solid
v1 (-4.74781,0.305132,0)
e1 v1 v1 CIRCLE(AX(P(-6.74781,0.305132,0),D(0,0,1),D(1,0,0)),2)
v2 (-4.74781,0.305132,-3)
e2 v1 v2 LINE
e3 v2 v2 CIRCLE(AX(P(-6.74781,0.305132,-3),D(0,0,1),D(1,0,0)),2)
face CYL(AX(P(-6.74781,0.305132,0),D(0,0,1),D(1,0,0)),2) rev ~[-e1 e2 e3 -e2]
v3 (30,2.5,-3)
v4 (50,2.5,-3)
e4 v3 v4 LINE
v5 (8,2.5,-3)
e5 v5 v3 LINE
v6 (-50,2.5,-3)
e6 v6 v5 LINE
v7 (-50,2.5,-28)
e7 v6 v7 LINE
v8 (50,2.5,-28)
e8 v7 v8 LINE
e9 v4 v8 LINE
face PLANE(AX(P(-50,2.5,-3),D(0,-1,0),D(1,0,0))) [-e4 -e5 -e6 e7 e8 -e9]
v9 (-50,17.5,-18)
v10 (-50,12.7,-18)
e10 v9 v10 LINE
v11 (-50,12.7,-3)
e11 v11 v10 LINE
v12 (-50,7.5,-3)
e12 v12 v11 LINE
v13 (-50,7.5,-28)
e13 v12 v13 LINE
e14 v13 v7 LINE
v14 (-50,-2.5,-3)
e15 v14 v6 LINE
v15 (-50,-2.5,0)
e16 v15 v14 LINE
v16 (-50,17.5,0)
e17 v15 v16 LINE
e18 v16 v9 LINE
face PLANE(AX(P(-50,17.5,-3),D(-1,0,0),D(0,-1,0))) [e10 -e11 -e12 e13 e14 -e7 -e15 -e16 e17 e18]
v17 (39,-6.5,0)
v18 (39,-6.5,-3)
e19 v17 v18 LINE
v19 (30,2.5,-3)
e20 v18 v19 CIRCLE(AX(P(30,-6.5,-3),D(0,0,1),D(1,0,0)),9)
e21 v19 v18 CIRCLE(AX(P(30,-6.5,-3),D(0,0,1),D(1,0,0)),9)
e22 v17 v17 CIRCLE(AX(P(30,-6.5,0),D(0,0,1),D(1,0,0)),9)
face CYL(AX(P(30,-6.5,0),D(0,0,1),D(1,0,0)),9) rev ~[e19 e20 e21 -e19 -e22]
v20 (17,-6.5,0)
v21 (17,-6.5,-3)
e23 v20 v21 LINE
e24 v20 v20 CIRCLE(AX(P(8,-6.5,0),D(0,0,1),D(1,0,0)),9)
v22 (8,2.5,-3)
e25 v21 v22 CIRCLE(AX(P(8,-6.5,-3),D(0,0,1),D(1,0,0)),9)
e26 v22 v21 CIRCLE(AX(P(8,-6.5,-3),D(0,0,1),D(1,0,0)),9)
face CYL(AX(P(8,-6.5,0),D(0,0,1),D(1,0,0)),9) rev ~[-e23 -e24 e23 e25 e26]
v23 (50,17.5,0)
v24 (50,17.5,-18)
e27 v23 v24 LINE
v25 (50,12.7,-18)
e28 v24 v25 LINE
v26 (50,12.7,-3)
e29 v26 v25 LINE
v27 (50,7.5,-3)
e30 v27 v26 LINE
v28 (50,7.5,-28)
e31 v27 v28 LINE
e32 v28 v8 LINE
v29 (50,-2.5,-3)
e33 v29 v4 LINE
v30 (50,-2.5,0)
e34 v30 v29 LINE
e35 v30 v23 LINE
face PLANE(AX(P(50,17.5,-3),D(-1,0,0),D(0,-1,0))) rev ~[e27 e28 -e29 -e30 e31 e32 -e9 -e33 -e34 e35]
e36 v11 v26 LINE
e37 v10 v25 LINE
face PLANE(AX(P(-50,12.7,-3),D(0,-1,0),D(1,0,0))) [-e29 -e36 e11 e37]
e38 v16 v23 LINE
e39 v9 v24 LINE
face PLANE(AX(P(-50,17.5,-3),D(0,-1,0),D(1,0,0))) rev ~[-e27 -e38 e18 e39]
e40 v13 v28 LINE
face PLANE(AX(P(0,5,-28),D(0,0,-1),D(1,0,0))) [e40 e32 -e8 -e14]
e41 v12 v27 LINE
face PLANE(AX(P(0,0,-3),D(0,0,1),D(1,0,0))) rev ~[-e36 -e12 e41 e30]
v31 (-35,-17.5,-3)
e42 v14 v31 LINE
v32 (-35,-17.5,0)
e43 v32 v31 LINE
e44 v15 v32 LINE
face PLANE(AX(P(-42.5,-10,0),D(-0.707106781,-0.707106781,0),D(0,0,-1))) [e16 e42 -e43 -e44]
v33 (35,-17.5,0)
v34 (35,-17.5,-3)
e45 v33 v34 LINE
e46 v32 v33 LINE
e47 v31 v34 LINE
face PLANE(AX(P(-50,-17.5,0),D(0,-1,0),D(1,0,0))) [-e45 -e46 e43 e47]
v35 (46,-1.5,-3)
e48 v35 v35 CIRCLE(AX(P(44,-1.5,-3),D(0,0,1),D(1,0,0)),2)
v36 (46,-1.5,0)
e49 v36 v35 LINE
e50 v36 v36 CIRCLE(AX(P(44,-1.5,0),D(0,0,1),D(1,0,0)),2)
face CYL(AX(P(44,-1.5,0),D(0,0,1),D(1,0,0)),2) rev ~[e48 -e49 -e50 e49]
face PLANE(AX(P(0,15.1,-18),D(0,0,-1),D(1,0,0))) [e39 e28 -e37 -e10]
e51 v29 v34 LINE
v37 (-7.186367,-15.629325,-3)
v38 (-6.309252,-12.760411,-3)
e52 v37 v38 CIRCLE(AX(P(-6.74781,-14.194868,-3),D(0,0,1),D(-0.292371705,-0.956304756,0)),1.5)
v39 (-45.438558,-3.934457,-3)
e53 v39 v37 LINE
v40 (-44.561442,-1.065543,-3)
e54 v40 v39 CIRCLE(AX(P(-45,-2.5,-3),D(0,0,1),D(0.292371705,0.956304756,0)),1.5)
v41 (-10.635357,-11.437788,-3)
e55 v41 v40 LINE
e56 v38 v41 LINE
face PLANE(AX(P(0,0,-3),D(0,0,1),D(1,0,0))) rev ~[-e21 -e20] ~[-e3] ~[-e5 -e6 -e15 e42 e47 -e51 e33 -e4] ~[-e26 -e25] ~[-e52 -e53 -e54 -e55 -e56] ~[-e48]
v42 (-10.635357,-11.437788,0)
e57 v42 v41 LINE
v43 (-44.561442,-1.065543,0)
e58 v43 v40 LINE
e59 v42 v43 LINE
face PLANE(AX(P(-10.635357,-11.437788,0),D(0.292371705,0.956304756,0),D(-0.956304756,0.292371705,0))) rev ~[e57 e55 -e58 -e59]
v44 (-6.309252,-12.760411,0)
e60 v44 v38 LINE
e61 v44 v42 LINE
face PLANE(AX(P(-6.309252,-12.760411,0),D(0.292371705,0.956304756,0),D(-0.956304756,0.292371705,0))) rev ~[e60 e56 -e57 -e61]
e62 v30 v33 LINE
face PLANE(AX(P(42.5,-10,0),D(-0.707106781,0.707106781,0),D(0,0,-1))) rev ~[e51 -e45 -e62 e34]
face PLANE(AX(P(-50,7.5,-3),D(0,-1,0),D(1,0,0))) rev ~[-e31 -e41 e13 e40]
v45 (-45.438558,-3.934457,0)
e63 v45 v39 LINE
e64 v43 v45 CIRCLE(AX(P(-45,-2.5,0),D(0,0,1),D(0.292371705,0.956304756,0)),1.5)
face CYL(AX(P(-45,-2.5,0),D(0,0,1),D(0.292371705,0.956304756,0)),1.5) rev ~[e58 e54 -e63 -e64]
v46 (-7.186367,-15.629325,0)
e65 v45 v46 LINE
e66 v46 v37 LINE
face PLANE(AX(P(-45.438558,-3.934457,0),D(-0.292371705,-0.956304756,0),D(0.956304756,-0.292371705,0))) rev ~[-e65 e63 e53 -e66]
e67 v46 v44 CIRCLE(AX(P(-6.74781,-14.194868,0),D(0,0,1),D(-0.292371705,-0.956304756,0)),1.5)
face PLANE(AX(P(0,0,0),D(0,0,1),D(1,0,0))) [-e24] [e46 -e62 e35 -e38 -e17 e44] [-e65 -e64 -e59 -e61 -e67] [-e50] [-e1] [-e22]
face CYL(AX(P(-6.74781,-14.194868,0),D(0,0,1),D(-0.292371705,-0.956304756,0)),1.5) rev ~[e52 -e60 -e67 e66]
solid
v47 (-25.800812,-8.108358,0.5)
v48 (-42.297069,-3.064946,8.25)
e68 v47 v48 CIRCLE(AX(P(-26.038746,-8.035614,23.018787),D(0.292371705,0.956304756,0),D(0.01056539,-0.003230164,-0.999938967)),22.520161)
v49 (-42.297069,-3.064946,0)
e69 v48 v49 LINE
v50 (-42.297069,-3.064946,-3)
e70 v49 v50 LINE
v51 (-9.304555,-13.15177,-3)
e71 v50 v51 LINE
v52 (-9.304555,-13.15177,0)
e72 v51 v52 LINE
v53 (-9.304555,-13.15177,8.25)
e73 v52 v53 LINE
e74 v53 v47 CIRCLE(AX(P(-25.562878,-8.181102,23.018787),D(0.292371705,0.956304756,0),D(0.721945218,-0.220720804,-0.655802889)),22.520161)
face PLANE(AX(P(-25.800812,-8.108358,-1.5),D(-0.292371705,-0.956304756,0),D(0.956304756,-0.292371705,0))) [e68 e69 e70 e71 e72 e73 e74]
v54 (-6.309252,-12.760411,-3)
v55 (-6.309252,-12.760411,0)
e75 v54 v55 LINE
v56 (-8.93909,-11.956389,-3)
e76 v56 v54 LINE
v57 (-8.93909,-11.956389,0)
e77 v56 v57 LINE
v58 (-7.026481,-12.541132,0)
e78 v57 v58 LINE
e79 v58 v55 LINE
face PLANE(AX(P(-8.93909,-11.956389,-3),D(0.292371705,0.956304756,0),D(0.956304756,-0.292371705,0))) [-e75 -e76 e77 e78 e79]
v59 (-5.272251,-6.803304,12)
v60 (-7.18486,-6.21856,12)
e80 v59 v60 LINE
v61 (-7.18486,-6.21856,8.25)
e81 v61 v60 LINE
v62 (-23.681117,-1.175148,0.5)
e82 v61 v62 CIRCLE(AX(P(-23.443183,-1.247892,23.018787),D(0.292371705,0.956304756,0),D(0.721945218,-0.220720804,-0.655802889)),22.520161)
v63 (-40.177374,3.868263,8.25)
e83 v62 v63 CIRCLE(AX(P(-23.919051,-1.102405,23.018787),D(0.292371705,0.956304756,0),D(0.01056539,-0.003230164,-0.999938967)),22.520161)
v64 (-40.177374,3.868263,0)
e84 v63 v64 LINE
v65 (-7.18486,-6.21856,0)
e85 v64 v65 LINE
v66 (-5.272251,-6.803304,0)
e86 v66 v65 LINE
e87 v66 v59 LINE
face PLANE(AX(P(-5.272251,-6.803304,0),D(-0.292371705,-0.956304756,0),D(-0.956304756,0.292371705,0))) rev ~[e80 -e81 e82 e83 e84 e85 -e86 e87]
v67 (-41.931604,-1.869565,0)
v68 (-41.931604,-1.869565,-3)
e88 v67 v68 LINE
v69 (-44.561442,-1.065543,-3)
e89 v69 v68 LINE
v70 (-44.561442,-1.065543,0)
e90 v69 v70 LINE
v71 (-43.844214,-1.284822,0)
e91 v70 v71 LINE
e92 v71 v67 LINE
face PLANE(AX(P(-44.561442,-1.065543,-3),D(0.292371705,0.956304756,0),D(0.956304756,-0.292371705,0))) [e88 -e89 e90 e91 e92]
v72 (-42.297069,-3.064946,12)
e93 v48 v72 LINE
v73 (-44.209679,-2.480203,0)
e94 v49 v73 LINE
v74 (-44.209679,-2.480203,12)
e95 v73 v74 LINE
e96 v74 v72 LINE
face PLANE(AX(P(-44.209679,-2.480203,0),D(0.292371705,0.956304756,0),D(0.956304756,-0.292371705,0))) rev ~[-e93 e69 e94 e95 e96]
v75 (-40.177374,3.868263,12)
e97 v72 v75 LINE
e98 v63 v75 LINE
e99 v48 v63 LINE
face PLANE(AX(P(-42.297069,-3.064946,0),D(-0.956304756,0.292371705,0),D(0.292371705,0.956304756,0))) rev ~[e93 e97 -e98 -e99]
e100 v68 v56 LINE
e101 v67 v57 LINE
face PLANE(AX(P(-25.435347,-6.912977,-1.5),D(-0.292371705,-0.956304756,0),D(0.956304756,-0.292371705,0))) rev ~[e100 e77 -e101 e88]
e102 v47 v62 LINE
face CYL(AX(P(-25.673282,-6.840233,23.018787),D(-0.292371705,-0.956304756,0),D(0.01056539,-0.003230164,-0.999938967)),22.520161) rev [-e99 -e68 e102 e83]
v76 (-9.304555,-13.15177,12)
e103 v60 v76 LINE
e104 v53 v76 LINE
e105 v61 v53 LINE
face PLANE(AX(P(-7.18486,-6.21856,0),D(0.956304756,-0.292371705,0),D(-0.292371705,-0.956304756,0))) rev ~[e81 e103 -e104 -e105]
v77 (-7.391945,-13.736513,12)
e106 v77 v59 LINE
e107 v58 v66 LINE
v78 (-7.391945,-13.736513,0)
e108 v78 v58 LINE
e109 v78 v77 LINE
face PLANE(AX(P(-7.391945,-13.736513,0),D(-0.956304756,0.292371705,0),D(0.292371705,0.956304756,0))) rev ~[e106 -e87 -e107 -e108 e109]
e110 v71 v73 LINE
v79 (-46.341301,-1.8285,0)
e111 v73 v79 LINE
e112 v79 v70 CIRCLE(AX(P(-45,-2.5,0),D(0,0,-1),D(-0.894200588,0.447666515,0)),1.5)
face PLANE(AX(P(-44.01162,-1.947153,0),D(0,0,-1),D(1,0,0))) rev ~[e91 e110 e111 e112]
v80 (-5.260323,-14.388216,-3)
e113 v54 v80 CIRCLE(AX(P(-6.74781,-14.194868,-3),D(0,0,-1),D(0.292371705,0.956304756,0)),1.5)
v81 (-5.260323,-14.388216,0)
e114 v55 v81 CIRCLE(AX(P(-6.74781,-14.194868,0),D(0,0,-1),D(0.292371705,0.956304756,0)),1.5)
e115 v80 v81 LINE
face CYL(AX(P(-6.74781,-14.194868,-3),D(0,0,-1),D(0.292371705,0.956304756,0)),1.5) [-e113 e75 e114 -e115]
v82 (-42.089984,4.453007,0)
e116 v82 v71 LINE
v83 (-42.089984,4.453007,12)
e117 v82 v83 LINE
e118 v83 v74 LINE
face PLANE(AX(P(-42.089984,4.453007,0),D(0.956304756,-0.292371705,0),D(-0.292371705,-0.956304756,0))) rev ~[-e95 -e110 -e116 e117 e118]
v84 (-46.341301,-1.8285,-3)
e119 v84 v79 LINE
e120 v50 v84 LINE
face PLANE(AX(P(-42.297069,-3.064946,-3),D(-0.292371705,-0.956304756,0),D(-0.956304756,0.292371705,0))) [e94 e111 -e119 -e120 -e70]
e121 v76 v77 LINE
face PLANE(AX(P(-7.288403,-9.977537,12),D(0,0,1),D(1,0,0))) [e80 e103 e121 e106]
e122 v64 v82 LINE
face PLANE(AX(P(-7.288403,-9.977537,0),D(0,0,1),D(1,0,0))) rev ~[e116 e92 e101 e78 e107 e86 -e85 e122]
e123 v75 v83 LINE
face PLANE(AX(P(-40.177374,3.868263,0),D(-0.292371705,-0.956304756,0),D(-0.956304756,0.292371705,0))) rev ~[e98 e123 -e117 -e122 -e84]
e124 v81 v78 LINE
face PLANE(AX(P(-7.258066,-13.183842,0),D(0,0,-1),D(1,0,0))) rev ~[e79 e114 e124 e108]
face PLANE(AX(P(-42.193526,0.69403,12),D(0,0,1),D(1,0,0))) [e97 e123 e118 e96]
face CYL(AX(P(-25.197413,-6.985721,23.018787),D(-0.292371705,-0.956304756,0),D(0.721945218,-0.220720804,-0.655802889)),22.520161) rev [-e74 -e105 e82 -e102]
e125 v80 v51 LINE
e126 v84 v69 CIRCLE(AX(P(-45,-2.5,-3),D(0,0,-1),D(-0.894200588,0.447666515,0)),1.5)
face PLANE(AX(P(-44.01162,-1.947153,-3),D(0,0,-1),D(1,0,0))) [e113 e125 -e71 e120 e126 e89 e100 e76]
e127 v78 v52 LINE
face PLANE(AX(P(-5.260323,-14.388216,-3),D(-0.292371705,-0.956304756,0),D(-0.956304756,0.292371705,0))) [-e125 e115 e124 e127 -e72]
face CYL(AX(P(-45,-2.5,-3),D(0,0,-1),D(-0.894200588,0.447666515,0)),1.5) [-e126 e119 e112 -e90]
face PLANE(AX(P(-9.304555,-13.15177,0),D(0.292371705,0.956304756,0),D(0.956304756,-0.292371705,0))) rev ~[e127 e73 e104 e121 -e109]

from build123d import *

# Parameters (mm, degrees)
F0_W      = 100
F0_H      = 35
F1_DEPTH  = 3
F2_W      = 100
F2_H      = 5
F3_DEPTH  = 25
F2_H_2    = 4.8
F4_DEPTH  = 15
F5_SIZE   = 15
F6_R      = 9
F6_R_2    = 2
F7_DEPTH  = 30
F9_DEPTH  = 1.25
F10_DEPTH = 6
F12_DEPTH = 3
F14_DEPTH = 12


with BuildPart() as f1:
    # F0 (on Top) → F1 (new body)
    with BuildSketch(Plane.XY):
        Rectangle(F0_W, F0_H)
    extrude(amount=-F1_DEPTH)

    # F2 (on face) → F3 (join)
    with BuildSketch(Plane(origin=(0, 0, -3), x_dir=(1, 0, 0), z_dir=(0, 0, -1))):
        with Locations((0, -5)):
            Rectangle(F2_W, F2_H)
    extrude(amount=F3_DEPTH)

    # F2 (on face) → F4 (join)
    with BuildSketch(Plane(origin=(0, 0, -3), x_dir=(1, 0, 0), z_dir=(0, 0, -1))):
        with Locations((0, -15.1)):
            Rectangle(F2_W, F2_H_2)
    extrude(amount=F4_DEPTH)

    # F5
    f5_edges = [f1.edges().sort_by_distance(p)[0] for p in [
        (50, -17.5, -1.5),
        (-50, -17.5, -1.5),
    ]]
    chamfer(f5_edges, length=F5_SIZE)

    # F6 (on face) → F7 (cut)
    with BuildSketch(Plane.XY):
        with BuildLine():
            Line((-45.4385575571, -3.9344571339), (-7.1863673186, -15.6293253229))
            ThreePointArc((-7.1863673186, -15.6293253229), (-5.3133526275, -14.633425746), (-6.3092522044, -12.760411055))
            Line((-6.3092522044, -12.760411055), (-10.635357075, -11.4377880648))
            Line((-10.635357075, -11.4377880648), (-44.5614424429, -1.0655428661))
            ThreePointArc((-44.5614424429, -1.0655428661), (-46.4344571339, -2.0614424429), (-45.4385575571, -3.9344571339))
        make_face()
        with Locations((30, -6.5)):
            Circle(F6_R)
        with Locations((8, -6.5)):
            Circle(F6_R)
        with Locations((-6.7478097615, 0.3051318111)):
            Circle(F6_R_2)
        with Locations((44, -1.5)):
            Circle(F6_R_2)
    extrude(amount=-F7_DEPTH, mode=Mode.SUBTRACT)


with BuildPart() as f9:
    # F8 (on face) → F9 (new body)
    with BuildSketch(Plane(origin=(-4.1070881898, -13.4336801598, 0), x_dir=(0.956304756, -0.2923717047, 0), z_dir=(-0.2923717047, -0.956304756, 0))):
        Polygon((-5.0527847565, 0), (-22.3027847565, 0), (-39.5527847565, 0), (-39.5527847565, -3), (-5.0527847565, -3), align=None)
        with BuildLine():
            Line((-39.5527847565, 0), (-22.3027847565, 0))
            Line((-22.3027847565, 0), (-5.0527847565, 0))
            Line((-5.0527847565, 0), (-5.0527847565, 8.25))
            ThreePointArc((-5.0527847565, 8.25), (-12.8248807082, 2.4766006665), (-22.3027847565, 0.5))
            ThreePointArc((-22.3027847565, 0.5), (-31.7806888049, 2.4766006665), (-39.5527847565, 8.25))
            Line((-39.5527847565, 8.25), (-39.5527847565, 0))
        make_face()
    extrude(amount=F9_DEPTH)

    # F8 (on face) → F10 (join)
    with BuildSketch(Plane(origin=(-4.1070881898, -13.4336801598, 0), x_dir=(0.956304756, -0.2923717047, 0), z_dir=(-0.2923717047, -0.956304756, 0))):
        with BuildLine():
            Line((-39.5527847565, 0), (-22.3027847565, 0))
            Line((-22.3027847565, 0), (-5.0527847565, 0))
            Line((-5.0527847565, 0), (-5.0527847565, 8.25))
            ThreePointArc((-5.0527847565, 8.25), (-12.8248807082, 2.4766006665), (-22.3027847565, 0.5))
            ThreePointArc((-22.3027847565, 0.5), (-31.7806888049, 2.4766006665), (-39.5527847565, 8.25))
            Line((-39.5527847565, 8.25), (-39.5527847565, 0))
        make_face()
    extrude(amount=-F10_DEPTH)

    # F11 (on face) → F12 (join, through all)
    with BuildSketch(Plane(origin=(0, 0, -3), x_dir=(1, 0, 0), z_dir=(0, 0, -1))):
        with BuildLine():
            ThreePointArc((-46.3413008821, 1.8285002281), (-45.5909842314, 1.1213275813), (-44.5614424429, 1.0655428661))
            Line((-44.5614424429, 1.0655428661), (-41.931604364, 1.869565054))
            Line((-41.931604364, 1.869565054), (-42.2970689949, 3.064945999))
            Line((-42.2970689949, 3.064945999), (-46.3413008821, 1.8285002281))
        make_face()
        with BuildLine():
            Line((-9.3045549142, 13.1517698119), (-8.9390902833, 11.956388867))
            Line((-8.9390902833, 11.956388867), (-6.3092522044, 12.760411055))
            ThreePointArc((-6.3092522044, 12.760411055), (-5.4869177961, 13.3823711418), (-5.260323027, 14.3882155828))
            Line((-5.260323027, 14.3882155828), (-9.3045549142, 13.1517698119))
        make_face()
    extrude(amount=-F12_DEPTH)

    # F13 (on face) → F14 (join)
    with BuildSketch(Plane.XY):
        Polygon((-7.184860055, -6.2185603312), (-9.3045549142, -13.1517698119), (-7.3919454023, -13.7365132214), (-5.272250543, -6.8033037406), align=None)
        Polygon((-44.2096785068, -2.4802025896), (-42.2970689949, -3.064945999), (-40.1773741357, 3.8682634817), (-42.0899836476, 4.4530068912), align=None)
    extrude(amount=F14_DEPTH)


solid = Compound([f1.part, f9.part])
